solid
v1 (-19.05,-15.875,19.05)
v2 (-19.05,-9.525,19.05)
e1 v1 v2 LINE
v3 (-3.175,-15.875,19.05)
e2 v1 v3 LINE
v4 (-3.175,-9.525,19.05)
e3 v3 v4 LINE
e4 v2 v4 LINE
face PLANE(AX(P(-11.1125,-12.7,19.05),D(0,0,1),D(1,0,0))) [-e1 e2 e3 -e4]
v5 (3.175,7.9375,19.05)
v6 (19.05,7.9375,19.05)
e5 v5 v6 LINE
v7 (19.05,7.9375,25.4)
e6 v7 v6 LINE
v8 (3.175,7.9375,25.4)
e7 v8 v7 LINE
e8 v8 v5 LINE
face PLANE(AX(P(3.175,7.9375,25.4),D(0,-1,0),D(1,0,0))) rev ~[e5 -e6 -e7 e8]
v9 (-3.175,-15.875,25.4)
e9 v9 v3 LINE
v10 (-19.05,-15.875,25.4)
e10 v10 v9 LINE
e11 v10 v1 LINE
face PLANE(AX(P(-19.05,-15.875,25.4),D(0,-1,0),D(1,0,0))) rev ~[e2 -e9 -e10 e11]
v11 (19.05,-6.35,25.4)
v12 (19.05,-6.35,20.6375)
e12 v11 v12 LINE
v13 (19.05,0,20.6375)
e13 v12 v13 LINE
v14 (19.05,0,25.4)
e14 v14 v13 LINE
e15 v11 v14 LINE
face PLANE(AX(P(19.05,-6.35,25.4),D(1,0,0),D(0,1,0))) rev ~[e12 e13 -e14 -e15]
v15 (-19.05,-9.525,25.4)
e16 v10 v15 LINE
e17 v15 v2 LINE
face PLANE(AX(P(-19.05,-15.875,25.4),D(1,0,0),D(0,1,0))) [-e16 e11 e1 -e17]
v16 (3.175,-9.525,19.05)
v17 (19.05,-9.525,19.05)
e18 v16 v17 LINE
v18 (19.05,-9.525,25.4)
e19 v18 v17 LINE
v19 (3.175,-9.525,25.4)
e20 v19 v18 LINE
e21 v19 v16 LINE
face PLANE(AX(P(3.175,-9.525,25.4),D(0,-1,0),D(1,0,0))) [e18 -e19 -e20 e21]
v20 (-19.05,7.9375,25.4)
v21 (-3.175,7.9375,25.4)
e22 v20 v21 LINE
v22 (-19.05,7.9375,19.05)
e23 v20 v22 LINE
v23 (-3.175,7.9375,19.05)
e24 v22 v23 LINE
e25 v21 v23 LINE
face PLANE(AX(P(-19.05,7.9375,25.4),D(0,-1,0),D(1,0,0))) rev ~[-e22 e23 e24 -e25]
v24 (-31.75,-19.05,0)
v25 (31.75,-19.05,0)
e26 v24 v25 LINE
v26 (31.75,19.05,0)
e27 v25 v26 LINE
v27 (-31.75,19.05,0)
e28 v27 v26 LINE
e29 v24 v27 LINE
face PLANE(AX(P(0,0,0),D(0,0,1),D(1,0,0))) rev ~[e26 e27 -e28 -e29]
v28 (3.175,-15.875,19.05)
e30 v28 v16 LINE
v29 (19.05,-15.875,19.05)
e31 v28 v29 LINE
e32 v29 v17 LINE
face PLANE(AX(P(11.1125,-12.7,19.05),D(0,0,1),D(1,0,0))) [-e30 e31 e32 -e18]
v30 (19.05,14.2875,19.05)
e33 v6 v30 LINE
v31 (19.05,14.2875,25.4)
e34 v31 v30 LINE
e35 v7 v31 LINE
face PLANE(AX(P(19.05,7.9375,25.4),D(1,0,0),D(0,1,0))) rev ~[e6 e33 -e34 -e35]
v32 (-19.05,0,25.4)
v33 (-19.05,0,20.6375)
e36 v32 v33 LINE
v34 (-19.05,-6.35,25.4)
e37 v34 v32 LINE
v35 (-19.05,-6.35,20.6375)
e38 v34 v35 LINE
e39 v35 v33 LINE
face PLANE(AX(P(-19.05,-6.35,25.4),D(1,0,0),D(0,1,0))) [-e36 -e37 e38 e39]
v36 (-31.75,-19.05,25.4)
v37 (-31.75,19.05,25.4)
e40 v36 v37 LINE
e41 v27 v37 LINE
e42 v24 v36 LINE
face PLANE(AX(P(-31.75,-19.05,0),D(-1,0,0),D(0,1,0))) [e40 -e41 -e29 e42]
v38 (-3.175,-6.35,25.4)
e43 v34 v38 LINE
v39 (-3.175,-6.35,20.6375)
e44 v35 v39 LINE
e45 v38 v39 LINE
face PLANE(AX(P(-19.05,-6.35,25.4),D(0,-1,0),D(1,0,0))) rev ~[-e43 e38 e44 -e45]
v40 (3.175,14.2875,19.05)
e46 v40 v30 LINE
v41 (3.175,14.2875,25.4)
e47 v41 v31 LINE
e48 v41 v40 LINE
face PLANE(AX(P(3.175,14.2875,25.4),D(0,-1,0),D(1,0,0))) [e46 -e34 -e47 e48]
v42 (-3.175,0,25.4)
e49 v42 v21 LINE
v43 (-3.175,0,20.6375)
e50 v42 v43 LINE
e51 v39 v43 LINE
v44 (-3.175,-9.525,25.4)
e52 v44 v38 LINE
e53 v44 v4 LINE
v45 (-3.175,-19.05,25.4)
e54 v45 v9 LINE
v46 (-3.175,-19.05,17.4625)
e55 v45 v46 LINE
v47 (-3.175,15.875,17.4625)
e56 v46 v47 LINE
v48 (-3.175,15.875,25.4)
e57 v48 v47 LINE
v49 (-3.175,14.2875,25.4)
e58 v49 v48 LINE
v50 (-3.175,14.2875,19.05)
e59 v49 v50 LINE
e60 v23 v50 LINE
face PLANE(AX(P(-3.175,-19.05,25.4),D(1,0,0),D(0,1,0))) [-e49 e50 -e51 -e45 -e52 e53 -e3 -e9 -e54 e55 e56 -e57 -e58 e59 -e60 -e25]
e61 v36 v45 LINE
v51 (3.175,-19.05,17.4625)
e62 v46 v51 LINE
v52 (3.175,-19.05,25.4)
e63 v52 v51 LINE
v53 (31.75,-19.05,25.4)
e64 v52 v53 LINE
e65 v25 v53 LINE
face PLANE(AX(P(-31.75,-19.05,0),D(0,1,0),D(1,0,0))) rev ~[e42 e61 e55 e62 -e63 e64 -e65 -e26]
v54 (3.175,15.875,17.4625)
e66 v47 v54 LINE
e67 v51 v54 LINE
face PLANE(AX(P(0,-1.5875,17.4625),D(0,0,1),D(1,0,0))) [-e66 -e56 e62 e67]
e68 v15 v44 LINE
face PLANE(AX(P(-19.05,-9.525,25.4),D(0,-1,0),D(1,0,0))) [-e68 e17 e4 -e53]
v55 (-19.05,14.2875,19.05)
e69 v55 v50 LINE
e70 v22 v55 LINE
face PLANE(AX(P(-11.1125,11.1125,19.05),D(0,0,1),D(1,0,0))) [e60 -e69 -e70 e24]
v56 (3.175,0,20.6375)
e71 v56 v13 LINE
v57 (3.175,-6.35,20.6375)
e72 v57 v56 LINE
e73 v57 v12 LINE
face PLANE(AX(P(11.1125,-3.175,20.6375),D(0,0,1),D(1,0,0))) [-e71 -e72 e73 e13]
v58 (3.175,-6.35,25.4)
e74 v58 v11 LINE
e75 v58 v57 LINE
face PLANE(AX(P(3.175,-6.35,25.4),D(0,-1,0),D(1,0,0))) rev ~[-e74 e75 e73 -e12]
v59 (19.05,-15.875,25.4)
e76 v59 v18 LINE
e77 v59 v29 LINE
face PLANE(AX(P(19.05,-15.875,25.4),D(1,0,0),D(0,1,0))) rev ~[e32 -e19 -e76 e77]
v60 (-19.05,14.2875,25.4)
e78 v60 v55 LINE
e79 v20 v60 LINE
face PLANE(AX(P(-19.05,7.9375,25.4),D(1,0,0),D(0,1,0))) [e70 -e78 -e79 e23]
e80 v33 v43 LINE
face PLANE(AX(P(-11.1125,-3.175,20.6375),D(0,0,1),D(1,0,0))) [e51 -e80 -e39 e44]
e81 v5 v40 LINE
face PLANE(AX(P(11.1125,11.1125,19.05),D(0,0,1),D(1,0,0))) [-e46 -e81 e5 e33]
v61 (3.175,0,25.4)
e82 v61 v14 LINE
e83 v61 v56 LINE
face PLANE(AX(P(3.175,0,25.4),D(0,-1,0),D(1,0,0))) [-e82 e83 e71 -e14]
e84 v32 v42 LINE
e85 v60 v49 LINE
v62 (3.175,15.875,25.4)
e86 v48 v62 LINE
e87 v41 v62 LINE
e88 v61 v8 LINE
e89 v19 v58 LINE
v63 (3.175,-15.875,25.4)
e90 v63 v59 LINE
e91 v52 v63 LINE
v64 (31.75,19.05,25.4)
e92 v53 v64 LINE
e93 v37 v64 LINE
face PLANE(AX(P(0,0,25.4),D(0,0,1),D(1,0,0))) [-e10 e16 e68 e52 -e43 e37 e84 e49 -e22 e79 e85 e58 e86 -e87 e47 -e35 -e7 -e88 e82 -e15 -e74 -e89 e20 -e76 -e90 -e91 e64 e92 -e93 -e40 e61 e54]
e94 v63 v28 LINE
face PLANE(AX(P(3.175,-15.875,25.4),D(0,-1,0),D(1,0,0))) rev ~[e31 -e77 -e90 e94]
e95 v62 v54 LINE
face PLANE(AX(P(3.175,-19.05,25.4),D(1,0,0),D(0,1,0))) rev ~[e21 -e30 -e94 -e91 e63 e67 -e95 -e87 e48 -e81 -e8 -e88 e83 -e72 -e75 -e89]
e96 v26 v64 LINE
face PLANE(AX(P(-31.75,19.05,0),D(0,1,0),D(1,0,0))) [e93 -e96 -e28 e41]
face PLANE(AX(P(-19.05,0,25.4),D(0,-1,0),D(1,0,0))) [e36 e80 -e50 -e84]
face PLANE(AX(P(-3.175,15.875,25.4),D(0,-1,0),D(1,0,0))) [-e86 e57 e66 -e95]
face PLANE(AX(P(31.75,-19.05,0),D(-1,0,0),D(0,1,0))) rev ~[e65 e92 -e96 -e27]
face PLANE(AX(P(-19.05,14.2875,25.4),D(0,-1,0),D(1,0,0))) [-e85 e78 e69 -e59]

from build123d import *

# Parameters (mm, degrees)
F0_W     = 63.5
F0_H     = 38.1
F1_DEPTH = 25.4
F2_W     = 6.35
F2_H     = 34.925
F4_DEPTH = 7.9375
F3_W     = 15.875
F3_H     = 6.35
F5_DEPTH = 6.35
F6_DEPTH = 4.7625


# Not quite as in the source:
# - a length typed as a fraction of an inch, garbled in the dataset ("3 / 203.2 mm" for 3/8 in), is restored


with BuildPart() as f1:
    # F0 (on Top) → F1 (new body)
    with BuildSketch(Plane.XY):
        Rectangle(F0_W, F0_H)
    extrude(amount=F1_DEPTH)

    # F2 (on face) → F4 (cut)
    with BuildSketch(Plane.XY.offset(25.4)):
        with Locations((0, -1.5875)):
            Rectangle(F2_W, F2_H)
    extrude(amount=-F4_DEPTH, mode=Mode.SUBTRACT)

    # F3 (on face) → F5 (cut)
    with BuildSketch(Plane.XY.offset(25.4)):
        with Locations((11.1125, 11.1125)):
            Rectangle(F3_W, F3_H)
        with Locations((-11.1125, 11.1125)):
            Rectangle(F3_W, F3_H)
        with Locations((11.1125, -12.7)):
            Rectangle(F3_W, F3_H)
        with Locations((-11.1125, -12.7)):
            Rectangle(F3_W, F3_H)
    extrude(amount=-F5_DEPTH, mode=Mode.SUBTRACT)

    # F3 (on face) → F6 (cut)
    with BuildSketch(Plane.XY.offset(25.4)):
        with Locations((11.1125, -3.175)):
            Rectangle(F3_W, F3_H)
        with Locations((-11.1125, -3.175)):
            Rectangle(F3_W, F3_H)
    extrude(amount=-F6_DEPTH, mode=Mode.SUBTRACT)


solid = f1.part
